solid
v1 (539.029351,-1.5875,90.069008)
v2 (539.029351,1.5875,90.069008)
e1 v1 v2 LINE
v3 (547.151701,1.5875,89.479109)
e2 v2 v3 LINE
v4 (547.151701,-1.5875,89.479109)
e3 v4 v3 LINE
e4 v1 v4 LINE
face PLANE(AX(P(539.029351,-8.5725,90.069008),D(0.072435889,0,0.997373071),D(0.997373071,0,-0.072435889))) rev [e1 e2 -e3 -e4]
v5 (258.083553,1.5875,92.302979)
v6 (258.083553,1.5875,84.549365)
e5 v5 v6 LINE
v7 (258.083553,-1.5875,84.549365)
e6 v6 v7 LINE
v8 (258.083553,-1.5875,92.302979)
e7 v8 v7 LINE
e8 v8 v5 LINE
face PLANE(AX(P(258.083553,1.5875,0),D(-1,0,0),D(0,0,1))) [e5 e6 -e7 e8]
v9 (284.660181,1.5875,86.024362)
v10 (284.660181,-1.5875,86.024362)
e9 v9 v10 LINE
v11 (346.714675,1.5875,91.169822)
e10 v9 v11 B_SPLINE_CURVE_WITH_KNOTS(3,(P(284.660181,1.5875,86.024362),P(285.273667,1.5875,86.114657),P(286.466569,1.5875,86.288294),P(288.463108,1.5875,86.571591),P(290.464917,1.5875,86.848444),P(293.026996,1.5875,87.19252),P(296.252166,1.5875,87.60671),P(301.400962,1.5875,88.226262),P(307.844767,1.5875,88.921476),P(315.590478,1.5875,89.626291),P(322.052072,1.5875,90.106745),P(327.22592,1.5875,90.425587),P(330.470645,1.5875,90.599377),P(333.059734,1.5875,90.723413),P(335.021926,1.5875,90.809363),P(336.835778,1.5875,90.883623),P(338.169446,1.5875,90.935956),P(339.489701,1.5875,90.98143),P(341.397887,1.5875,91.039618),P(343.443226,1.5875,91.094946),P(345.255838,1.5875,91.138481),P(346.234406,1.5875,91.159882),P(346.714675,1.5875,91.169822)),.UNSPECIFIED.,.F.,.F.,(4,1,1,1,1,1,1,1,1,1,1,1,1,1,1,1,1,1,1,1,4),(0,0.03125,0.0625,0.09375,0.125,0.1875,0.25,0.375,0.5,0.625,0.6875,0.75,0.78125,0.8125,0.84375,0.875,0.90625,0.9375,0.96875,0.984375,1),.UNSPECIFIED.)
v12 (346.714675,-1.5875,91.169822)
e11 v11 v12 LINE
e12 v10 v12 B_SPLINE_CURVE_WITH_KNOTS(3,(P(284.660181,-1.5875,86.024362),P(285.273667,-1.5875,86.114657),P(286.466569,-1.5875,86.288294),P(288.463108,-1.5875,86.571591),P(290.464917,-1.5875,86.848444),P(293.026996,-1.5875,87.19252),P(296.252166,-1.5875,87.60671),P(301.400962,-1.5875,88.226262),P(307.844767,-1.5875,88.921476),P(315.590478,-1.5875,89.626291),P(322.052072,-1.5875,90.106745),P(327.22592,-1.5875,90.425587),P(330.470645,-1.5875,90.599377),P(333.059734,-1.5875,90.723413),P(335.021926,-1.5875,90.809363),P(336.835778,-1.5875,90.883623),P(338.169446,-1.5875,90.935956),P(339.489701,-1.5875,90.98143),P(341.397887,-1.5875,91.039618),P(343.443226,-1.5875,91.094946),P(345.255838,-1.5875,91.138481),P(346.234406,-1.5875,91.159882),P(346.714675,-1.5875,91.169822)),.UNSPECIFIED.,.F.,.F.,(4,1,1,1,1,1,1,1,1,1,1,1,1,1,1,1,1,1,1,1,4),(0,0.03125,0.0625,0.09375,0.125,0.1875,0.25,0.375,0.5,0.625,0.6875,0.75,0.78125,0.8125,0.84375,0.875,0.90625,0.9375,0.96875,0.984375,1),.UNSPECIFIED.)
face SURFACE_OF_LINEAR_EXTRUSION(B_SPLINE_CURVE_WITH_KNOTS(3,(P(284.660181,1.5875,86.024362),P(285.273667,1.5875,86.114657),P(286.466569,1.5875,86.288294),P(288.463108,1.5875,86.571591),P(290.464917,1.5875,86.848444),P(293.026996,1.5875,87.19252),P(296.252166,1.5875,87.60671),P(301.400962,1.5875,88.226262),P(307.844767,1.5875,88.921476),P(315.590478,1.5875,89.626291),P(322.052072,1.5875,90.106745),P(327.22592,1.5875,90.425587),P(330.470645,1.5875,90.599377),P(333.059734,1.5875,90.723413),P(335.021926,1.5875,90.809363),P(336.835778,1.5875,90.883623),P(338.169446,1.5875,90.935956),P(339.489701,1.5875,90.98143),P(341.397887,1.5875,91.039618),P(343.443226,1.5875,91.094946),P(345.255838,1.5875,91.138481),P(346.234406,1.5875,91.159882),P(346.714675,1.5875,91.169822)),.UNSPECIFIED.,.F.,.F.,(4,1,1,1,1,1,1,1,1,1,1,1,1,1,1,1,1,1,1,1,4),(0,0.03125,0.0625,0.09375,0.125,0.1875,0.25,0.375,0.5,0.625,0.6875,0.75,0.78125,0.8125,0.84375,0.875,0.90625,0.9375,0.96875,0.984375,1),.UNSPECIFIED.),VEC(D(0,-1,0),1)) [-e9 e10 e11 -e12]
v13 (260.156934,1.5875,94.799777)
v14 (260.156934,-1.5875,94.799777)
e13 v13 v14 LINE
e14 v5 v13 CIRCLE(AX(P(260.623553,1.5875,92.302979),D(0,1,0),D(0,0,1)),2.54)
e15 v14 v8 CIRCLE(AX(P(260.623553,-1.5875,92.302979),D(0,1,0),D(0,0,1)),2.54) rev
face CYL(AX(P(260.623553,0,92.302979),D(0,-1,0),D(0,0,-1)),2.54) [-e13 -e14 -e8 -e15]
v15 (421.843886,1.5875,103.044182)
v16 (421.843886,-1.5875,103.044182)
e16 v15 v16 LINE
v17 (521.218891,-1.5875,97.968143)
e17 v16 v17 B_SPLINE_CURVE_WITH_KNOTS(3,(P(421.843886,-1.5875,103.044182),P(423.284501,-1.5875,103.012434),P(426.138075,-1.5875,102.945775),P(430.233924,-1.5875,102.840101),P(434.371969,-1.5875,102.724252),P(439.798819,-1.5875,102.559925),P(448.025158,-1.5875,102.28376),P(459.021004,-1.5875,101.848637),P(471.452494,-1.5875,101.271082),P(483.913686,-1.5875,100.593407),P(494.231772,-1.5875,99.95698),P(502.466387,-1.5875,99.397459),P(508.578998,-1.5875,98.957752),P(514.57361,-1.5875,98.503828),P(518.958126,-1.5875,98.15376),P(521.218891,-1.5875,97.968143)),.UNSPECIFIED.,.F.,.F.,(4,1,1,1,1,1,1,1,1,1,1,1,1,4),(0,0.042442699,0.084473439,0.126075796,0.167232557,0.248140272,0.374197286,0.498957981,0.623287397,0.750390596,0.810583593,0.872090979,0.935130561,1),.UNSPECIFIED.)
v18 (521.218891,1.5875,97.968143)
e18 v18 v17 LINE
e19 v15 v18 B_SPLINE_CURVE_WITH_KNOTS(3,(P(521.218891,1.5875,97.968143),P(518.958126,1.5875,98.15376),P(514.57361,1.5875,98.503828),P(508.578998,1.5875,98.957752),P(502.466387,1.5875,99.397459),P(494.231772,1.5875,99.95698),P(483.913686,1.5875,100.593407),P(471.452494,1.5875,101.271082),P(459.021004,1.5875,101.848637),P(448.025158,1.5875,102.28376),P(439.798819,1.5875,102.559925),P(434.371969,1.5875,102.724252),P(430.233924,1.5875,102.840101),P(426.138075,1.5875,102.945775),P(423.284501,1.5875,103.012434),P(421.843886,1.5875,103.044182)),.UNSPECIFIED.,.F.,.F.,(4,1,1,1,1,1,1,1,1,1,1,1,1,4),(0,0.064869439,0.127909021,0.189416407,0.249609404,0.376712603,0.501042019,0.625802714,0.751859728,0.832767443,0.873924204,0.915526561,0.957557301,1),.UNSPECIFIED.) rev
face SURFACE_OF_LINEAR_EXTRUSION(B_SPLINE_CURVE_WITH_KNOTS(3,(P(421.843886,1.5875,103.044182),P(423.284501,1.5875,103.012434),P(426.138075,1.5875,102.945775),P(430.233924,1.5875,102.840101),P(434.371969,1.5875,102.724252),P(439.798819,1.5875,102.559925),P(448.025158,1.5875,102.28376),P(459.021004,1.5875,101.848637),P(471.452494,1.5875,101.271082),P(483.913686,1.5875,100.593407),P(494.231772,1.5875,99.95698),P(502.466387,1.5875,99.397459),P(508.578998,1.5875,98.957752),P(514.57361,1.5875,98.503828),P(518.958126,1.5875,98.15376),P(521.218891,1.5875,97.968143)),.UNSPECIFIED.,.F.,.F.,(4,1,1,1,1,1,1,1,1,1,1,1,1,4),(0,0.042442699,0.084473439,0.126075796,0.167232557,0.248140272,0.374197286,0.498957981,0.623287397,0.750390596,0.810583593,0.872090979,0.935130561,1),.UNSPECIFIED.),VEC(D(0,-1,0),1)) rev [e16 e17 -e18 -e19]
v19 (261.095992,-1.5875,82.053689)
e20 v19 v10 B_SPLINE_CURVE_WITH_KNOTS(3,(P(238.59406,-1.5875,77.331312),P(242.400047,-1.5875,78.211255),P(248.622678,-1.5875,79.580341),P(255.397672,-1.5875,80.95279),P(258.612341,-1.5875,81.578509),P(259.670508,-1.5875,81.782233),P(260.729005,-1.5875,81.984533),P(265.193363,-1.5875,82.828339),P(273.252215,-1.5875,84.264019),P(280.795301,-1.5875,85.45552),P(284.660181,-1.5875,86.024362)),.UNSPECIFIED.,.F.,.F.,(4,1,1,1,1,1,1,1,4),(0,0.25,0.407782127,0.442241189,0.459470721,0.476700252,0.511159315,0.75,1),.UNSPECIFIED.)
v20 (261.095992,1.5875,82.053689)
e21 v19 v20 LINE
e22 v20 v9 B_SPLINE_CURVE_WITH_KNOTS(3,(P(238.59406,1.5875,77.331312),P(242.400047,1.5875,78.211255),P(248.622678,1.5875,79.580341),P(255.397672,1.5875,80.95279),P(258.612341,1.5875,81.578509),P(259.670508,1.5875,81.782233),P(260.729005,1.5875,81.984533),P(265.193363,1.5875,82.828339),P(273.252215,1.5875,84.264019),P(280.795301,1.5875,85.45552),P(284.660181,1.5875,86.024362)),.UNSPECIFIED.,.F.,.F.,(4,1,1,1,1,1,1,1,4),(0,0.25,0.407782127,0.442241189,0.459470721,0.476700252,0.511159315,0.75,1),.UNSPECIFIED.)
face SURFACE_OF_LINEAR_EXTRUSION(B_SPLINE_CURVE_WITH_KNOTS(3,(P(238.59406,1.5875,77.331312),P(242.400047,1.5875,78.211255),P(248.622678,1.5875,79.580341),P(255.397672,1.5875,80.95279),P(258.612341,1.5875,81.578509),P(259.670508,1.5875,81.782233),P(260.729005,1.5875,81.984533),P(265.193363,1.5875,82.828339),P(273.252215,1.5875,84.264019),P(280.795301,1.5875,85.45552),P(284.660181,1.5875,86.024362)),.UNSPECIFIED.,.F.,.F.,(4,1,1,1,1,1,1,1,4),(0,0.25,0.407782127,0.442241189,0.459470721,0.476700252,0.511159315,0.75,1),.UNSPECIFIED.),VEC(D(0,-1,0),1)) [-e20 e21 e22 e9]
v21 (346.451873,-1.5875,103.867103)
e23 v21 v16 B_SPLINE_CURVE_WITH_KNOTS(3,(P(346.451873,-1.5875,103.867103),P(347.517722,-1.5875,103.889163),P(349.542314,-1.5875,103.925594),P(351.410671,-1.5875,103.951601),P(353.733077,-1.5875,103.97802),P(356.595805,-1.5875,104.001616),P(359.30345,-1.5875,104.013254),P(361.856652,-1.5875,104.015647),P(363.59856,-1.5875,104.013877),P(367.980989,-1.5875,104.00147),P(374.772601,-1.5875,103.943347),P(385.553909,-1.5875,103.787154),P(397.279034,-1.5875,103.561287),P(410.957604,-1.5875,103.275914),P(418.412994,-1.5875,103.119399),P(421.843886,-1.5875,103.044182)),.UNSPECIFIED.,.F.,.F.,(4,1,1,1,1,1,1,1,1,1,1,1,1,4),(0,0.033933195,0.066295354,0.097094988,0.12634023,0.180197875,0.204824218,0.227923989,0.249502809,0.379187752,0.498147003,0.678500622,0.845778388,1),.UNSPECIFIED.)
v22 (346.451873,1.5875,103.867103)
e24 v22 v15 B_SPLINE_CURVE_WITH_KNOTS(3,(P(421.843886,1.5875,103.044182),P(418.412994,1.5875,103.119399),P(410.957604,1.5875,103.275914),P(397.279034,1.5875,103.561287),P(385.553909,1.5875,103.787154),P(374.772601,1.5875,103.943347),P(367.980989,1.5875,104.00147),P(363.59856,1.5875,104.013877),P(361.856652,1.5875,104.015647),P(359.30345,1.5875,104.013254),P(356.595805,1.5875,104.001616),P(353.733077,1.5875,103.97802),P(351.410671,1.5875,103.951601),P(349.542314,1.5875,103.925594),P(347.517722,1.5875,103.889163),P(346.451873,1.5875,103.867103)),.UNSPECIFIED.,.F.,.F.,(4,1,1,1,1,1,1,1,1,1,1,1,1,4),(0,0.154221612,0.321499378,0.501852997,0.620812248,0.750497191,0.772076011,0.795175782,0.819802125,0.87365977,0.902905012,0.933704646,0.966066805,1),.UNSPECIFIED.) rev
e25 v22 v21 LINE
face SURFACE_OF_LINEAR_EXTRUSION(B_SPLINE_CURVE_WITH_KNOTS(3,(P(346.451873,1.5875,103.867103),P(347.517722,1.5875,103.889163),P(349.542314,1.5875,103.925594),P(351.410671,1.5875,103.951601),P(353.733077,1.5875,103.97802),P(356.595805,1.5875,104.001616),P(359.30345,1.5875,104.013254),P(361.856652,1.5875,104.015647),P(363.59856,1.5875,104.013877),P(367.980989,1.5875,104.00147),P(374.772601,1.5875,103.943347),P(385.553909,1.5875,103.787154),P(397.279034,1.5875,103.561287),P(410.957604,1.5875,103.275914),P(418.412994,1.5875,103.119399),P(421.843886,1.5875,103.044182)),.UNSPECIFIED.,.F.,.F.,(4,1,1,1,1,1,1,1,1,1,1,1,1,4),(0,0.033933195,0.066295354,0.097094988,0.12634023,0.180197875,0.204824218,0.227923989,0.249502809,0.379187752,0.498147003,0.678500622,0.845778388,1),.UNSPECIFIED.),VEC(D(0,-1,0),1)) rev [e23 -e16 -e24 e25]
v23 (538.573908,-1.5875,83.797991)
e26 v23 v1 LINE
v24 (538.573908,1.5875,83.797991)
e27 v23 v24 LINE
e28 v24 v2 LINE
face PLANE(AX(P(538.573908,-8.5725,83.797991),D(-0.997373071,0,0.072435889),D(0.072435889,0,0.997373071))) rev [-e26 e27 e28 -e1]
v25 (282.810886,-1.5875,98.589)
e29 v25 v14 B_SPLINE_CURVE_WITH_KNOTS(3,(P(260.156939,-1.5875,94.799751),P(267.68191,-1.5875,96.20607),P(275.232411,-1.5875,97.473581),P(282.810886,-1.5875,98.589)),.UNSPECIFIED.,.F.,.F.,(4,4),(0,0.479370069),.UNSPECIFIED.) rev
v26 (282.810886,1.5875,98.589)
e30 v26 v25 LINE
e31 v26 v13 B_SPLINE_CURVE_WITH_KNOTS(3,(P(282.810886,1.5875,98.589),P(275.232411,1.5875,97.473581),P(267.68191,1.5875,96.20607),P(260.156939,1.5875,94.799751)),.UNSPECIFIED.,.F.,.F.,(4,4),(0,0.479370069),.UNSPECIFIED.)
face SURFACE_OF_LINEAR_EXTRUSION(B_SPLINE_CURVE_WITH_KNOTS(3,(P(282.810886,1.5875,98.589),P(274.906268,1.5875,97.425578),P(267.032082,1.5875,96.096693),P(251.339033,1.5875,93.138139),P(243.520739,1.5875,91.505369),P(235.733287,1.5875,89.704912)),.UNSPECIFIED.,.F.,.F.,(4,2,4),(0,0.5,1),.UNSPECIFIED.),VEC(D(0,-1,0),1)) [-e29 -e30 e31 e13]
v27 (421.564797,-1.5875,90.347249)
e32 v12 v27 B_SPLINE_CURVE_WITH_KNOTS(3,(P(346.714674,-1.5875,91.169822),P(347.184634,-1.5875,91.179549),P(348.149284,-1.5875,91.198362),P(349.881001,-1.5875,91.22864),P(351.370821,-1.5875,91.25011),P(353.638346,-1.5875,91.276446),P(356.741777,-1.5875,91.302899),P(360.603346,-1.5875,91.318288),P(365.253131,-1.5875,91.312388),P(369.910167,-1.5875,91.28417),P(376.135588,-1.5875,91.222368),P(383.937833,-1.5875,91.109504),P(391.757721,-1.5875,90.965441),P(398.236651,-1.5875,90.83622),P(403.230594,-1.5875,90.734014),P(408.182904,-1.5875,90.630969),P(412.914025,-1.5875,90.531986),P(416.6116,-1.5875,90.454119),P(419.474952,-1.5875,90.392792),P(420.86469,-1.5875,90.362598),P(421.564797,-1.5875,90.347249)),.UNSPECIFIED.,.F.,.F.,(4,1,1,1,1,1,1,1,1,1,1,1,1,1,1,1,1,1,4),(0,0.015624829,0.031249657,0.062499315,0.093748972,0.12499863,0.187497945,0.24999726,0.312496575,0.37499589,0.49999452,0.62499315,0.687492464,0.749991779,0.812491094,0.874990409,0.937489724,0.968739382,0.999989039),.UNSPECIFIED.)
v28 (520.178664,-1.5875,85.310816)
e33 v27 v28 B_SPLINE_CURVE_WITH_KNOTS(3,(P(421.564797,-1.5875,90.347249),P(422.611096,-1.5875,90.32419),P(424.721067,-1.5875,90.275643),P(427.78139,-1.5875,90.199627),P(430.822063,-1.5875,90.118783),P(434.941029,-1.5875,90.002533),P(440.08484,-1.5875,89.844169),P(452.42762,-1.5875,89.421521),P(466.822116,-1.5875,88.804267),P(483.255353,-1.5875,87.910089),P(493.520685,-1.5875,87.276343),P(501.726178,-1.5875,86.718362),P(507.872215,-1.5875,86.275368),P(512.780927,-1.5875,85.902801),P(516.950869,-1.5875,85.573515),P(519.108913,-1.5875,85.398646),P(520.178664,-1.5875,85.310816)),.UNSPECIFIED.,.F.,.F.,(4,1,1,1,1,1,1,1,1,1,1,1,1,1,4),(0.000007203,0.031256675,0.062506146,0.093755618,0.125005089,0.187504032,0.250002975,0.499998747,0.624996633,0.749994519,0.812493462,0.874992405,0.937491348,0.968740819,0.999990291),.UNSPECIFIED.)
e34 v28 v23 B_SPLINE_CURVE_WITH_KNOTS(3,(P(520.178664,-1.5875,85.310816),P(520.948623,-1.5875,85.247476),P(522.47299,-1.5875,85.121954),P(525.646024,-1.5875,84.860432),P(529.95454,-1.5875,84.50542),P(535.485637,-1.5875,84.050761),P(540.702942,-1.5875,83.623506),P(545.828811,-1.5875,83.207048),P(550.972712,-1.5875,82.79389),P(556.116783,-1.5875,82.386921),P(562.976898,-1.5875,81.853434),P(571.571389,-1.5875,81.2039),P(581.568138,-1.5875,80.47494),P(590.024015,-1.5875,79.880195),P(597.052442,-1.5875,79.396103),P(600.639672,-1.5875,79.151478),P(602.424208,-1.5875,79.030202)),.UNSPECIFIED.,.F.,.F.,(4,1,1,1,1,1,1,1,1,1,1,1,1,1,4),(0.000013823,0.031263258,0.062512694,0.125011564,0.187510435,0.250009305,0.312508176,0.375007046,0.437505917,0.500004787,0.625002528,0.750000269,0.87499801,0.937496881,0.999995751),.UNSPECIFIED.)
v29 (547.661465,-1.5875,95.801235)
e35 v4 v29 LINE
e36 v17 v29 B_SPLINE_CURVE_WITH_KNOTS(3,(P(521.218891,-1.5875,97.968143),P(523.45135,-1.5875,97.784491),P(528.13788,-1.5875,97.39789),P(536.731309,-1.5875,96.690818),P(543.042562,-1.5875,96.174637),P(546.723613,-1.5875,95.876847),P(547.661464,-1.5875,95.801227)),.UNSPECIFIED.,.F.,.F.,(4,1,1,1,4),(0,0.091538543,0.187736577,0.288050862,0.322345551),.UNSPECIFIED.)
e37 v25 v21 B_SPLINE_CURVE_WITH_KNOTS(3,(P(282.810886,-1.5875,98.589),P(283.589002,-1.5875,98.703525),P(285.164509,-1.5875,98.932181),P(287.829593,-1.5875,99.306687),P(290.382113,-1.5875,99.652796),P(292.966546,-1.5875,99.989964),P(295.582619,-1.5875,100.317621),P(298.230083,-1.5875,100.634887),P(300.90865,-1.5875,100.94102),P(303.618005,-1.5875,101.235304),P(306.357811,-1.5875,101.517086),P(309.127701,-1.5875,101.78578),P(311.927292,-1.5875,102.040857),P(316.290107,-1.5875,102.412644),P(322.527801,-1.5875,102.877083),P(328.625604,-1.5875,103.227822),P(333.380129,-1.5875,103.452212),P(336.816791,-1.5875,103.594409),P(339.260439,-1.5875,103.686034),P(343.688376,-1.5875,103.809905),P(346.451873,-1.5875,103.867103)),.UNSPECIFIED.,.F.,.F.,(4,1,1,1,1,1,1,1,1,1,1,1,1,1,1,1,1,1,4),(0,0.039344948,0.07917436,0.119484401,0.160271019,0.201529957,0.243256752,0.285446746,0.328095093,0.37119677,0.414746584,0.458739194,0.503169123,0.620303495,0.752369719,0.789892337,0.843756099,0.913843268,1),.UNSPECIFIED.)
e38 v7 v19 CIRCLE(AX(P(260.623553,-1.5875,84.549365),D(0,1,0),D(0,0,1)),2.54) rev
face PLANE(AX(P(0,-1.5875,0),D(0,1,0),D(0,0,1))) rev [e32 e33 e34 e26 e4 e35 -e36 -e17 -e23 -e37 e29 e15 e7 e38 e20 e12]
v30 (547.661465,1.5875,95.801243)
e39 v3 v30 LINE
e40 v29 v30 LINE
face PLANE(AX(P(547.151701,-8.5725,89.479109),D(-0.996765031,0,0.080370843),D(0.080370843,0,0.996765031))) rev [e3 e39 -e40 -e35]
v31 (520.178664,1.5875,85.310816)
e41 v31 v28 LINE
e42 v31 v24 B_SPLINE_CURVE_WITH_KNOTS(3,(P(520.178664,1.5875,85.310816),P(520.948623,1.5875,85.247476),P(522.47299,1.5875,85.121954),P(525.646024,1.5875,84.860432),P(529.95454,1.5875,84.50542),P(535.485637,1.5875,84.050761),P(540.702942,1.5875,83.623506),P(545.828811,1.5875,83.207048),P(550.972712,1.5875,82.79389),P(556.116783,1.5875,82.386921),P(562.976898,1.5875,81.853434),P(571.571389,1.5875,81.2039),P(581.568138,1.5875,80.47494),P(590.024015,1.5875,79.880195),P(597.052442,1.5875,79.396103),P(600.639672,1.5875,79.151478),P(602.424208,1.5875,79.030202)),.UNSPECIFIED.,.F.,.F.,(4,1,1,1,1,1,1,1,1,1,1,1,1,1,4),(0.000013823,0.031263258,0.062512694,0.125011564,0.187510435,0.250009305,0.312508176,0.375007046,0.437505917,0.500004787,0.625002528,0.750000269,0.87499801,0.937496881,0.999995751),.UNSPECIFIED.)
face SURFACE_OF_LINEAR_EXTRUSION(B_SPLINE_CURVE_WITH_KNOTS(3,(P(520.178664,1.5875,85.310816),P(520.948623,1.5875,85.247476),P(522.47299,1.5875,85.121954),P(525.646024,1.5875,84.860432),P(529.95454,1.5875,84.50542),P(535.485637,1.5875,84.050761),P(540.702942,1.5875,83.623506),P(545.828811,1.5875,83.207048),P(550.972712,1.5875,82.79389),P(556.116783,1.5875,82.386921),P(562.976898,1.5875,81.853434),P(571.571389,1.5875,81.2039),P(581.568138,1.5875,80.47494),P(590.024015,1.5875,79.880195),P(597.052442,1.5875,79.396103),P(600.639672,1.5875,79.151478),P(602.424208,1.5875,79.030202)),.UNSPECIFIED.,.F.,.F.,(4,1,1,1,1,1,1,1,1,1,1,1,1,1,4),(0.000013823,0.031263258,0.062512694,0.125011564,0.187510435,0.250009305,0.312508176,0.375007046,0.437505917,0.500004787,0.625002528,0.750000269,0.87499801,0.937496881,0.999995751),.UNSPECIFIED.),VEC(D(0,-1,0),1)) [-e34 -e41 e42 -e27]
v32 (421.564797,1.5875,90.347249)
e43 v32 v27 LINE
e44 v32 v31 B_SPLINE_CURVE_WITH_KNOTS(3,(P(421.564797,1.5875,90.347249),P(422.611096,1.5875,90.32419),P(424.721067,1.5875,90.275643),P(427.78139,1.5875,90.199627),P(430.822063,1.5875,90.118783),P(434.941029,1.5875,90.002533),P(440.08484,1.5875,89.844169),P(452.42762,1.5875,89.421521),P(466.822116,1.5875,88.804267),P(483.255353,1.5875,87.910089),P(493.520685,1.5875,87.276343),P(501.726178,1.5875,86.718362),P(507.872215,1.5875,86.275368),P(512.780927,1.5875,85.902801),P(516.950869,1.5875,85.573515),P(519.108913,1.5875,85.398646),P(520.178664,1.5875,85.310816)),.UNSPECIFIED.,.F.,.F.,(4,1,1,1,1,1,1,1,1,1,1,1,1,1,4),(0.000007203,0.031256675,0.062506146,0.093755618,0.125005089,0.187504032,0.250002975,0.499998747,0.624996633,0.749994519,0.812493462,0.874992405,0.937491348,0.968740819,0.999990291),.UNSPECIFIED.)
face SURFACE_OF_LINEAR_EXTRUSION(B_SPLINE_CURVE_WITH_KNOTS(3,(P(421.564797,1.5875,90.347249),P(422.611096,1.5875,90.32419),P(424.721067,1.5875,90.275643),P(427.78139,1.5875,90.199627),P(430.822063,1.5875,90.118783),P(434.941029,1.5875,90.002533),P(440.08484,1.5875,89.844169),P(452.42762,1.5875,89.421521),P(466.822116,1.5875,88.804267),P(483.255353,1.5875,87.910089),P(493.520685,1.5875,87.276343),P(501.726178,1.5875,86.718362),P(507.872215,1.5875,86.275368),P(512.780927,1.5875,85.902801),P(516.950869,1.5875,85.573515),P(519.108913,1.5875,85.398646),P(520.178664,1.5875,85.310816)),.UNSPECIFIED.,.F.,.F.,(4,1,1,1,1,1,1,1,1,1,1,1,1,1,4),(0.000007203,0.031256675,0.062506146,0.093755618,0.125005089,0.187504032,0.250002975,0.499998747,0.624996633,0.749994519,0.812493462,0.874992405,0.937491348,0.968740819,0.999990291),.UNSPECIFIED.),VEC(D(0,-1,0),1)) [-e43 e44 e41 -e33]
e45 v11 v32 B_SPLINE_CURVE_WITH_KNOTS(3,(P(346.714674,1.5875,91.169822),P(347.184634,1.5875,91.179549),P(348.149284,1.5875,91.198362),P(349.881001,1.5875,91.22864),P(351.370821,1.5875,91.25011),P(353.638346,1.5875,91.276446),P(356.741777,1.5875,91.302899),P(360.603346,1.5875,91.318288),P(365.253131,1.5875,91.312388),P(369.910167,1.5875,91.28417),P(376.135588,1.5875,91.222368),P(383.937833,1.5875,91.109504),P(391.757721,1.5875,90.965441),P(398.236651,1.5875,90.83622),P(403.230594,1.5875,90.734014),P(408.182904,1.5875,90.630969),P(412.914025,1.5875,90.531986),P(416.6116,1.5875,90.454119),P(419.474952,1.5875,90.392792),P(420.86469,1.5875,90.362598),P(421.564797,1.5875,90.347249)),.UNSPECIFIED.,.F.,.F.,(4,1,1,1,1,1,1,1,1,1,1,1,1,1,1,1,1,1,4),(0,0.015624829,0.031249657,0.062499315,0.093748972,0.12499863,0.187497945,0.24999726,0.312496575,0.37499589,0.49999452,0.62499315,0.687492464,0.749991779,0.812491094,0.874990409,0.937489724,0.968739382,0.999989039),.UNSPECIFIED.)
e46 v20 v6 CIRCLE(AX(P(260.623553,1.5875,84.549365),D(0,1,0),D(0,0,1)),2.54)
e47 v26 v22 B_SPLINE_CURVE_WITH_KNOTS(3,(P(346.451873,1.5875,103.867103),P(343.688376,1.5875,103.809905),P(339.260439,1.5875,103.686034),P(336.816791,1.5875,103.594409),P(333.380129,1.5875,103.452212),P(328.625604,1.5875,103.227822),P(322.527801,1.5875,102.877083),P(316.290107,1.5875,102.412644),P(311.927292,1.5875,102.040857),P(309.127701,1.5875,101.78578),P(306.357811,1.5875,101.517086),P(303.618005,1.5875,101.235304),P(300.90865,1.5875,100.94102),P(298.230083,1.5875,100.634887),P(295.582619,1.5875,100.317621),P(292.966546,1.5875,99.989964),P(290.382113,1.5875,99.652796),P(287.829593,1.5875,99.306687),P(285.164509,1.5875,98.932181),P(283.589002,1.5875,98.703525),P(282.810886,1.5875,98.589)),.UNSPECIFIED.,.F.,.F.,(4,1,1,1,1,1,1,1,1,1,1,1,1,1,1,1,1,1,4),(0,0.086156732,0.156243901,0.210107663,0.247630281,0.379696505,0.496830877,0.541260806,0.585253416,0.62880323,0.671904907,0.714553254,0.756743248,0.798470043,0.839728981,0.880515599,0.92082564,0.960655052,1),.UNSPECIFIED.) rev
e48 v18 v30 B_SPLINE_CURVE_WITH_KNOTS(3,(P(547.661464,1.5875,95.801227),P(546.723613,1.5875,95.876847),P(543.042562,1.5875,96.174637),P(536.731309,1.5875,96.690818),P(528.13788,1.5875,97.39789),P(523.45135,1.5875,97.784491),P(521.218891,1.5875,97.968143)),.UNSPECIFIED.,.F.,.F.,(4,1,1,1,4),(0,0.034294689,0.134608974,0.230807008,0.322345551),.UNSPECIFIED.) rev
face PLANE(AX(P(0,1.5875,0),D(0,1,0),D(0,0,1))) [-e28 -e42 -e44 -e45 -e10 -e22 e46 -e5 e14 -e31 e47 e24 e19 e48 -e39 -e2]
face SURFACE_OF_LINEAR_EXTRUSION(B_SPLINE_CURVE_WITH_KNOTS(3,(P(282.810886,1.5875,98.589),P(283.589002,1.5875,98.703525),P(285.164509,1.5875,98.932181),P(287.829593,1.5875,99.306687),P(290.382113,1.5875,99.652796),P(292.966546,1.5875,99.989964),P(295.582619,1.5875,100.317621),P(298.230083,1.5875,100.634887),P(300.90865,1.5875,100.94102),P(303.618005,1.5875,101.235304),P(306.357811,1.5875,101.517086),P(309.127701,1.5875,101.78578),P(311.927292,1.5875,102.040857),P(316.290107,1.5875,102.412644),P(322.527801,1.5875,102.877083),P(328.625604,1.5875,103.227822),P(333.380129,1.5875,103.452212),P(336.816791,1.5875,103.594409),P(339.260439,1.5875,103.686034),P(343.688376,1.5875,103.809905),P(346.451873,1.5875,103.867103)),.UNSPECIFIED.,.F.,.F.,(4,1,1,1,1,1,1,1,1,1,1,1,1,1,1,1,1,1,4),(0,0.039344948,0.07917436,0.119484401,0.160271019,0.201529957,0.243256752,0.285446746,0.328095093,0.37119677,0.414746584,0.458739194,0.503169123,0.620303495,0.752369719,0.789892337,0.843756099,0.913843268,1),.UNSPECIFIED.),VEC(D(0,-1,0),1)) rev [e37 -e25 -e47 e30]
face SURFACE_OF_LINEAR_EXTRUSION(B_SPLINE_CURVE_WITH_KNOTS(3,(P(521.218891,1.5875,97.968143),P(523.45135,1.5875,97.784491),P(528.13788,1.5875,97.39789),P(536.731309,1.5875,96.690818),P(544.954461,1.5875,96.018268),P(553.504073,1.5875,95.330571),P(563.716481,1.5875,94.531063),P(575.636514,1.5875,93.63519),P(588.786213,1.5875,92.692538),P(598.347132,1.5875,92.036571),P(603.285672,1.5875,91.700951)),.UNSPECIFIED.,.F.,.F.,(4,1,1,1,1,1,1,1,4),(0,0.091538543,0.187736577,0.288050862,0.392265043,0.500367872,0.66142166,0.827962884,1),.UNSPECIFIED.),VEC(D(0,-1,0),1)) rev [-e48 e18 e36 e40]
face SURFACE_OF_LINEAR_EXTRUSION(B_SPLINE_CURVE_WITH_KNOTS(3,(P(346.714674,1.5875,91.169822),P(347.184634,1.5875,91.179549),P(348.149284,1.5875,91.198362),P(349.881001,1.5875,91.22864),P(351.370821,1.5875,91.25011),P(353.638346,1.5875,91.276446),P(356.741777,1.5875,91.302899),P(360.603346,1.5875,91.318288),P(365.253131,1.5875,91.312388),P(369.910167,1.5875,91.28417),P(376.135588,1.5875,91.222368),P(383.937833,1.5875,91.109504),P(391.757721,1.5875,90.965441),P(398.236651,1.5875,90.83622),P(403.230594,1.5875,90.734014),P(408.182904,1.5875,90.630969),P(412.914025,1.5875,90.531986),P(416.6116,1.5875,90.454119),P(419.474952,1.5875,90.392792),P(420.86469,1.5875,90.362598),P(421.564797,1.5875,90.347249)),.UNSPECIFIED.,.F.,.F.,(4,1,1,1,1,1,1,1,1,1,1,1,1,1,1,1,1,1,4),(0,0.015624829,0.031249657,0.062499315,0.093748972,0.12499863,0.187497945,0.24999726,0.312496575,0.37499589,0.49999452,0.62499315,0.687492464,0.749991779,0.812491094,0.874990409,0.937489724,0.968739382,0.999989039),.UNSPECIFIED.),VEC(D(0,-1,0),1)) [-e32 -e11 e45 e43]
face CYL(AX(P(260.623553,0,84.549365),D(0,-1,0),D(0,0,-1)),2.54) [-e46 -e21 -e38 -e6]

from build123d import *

# Parameters (mm, degrees)
BOSS_EXTRUDE1_START = -1.5875
BOSS_EXTRUDE1_DEPTH = 3.175
FILLET1_R           = 2.54
CUT_EXTRUDE1_DEPTH  = 10.16


# Read off the part's stored shape, not the designer's step: Boss-Extrude1
with BuildPart() as part:
    # Boss-Extrude1 outline → Boss-Extrude1 (new body)
    with BuildSketch(Plane(origin=(0, 0, 0), x_dir=(1, 0, 0), z_dir=(0, 1, 0)).offset(BOSS_EXTRUDE1_START)):
        with BuildLine():
            add(Edge.make_bspline(
                [(701.573370465, -71.674259434), (702.04697488, -71.626796619), (702.961854911, -71.534187022), (704.527211696, -71.372087014), (706.256268563, -71.189411511), (708.433468196, -70.954566837), (711.038260137, -70.66442021), (715.259153852, -70.176918919), (720.517449562, -69.537326192), (728.939784684, -68.449094171), (739.471043309, -66.973596397), (752.121699379, -65.058370184), (764.774270693, -63.022725712), (775.332382372, -61.245644149), (783.768221701, -59.789793136), (790.217423582, -58.659365862), (795.556531692, -57.710632329), (799.706029598, -56.965839367), (801.743713725, -56.597532565), (802.76701547, -56.411910209)],
                knots=[1.1996e-05, 1.1996e-05, 1.1996e-05, 1.1996e-05, 0.015636808, 0.031261621, 0.046886433, 0.062511246, 0.093760871, 0.125010496, 0.187509746, 0.250008997, 0.375007497, 0.500005998, 0.625004498, 0.750002999, 0.812502249, 0.875001499, 0.93750075, 0.968750375, 1, 1, 1, 1], degree=3))
            add(Edge.make_bspline(
                [(696.057912544, -72.218303811), (696.516819195, -72.173843609), (697.434189716, -72.08448281), (698.812500771, -71.948951554), (700.191895387, -71.812223809), (701.113019016, -71.720314305), (701.573370465, -71.674259434)],
                knots=[0.000436824, 0.000436824, 0.000436824, 0.000436824, 0.250279009, 0.500121194, 0.749963378, 0.999805563, 0.999805563, 0.999805563, 0.999805563], degree=3))
            add(Edge.make_bspline(
                [(684.465771861, -73.258588893), (685.427037387, -73.178353817), (687.338409796, -73.01607439), (690.270265001, -72.757917882), (693.135698373, -72.496722872), (695.087462196, -72.311946881), (696.057912544, -72.218303811)],
                knots=[-3.996e-06, -3.996e-06, -3.996e-06, -3.996e-06, 0.249945754, 0.499895504, 0.749845254, 0.999795004, 0.999795004, 0.999795004, 0.999795004], degree=3))
            add(Edge.make_bspline(
                [(602.42420841, -79.030202072), (604.074214061, -78.917973041), (607.327656264, -78.697993222), (612.488020924, -78.352754528), (617.82142797, -77.998720132), (624.748165187, -77.541006681), (633.288768179, -76.978079707), (643.562499486, -76.293021789), (653.811394813, -75.590339748), (662.341271598, -74.981221252), (669.157253218, -74.473896148), (673.963588211, -74.106706625), (678.141033863, -73.776630779), (681.719672317, -73.486306526), (683.554235836, -73.334679882), (684.465771861, -73.258588893)],
                knots=[4.679e-06, 4.679e-06, 4.679e-06, 4.679e-06, 0.062504419, 0.125004159, 0.1875039, 0.25000364, 0.375003121, 0.500002601, 0.625002082, 0.750001563, 0.812501303, 0.875001043, 0.937500783, 0.968750654, 1.000000524, 1.000000524, 1.000000524, 1.000000524], degree=3))
            add(Edge.make_bspline(
                [(520.17866376, -85.310815783), (520.948622537, -85.247475703), (522.472990474, -85.121954498), (525.646023872, -84.860432492), (529.954540392, -84.505420462), (535.485636827, -84.050761487), (540.7029418, -83.623505808), (545.828810606, -83.207047886), (550.972711882, -82.793890253), (556.116782859, -82.386921041), (562.976897794, -81.853433898), (571.571389273, -81.203899916), (581.568137842, -80.474939815), (590.024015055, -79.880194977), (597.052441707, -79.396103056), (600.639671821, -79.151478022), (602.42420841, -79.030202072)],
                knots=[1.3823e-05, 1.3823e-05, 1.3823e-05, 1.3823e-05, 0.031263258, 0.062512694, 0.125011564, 0.187510435, 0.250009305, 0.312508176, 0.375007046, 0.437505917, 0.500004787, 0.625002528, 0.750000269, 0.87499801, 0.937496881, 0.999995751, 0.999995751, 0.999995751, 0.999995751], degree=3))
            add(Edge.make_bspline(
                [(421.564796931, -90.347249187), (422.61109619, -90.324190198), (424.721066812, -90.275643156), (427.781390104, -90.199626606), (430.822063258, -90.118782847), (434.941029322, -90.002532976), (440.08484045, -89.844168641), (452.427619866, -89.421521336), (466.822115937, -88.804267378), (483.25535308, -87.910089241), (493.52068453, -87.276342604), (501.726177762, -86.718361924), (507.872215251, -86.275368153), (512.780927318, -85.902800926), (516.950869137, -85.573515025), (519.108912611, -85.398645627), (520.17866376, -85.310815783)],
                knots=[7.203e-06, 7.203e-06, 7.203e-06, 7.203e-06, 0.031256675, 0.062506146, 0.093755618, 0.125005089, 0.187504032, 0.250002975, 0.499998747, 0.624996633, 0.749994519, 0.812493462, 0.874992405, 0.937491348, 0.968740819, 0.999990291, 0.999990291, 0.999990291, 0.999990291], degree=3))
            add(Edge.make_bspline(
                [(346.714675087, -91.169822314), (347.184634959, -91.179549272), (348.149283989, -91.198362445), (349.881001429, -91.228640124), (351.370820969, -91.250109563), (353.638345707, -91.276445536), (356.741777131, -91.30289862), (360.603346067, -91.318288447), (365.253131479, -91.312388009), (369.910166762, -91.284169995), (376.135587827, -91.222367993), (383.937832745, -91.109503558), (391.757720532, -90.96544109), (398.23665113, -90.836219907), (403.230594411, -90.734014325), (408.182903858, -90.630969164), (412.914025095, -90.531986169), (416.611599734, -90.454119205), (419.474951766, -90.392792196), (420.864689854, -90.36259776), (421.564796931, -90.347249187)],
                knots=[1.1e-08, 1.1e-08, 1.1e-08, 1.1e-08, 0.015624829, 0.031249657, 0.062499315, 0.093748972, 0.12499863, 0.187497945, 0.24999726, 0.312496575, 0.37499589, 0.49999452, 0.62499315, 0.687492464, 0.749991779, 0.812491094, 0.874990409, 0.937489724, 0.968739382, 0.999989039, 0.999989039, 0.999989039, 0.999989039], degree=3))
            add(Edge.make_bspline(
                [(284.660180705, -86.02436228), (285.273667186, -86.114656759), (286.466569449, -86.288293963), (288.463107874, -86.571590524), (290.46491743, -86.848444068), (293.02699573, -87.19252046), (296.252166304, -87.606710304), (301.400962421, -88.226261718), (307.844767088, -88.921476193), (315.590478493, -89.626291032), (322.05207179, -90.106744711), (327.225920355, -90.425587153), (330.470644664, -90.599377294), (333.059733967, -90.723413499), (335.02192621, -90.809363102), (336.835778016, -90.883623075), (338.1694462, -90.935956115), (339.489700776, -90.98142965), (341.397886756, -91.039617592), (343.443225624, -91.094945655), (345.255837503, -91.138480537), (346.23440638, -91.159881953), (346.714675087, -91.169822314)],
                knots=[0, 0, 0, 0, 0.03125, 0.0625, 0.09375, 0.125, 0.1875, 0.25, 0.375, 0.5, 0.625, 0.6875, 0.75, 0.78125, 0.8125, 0.84375, 0.875, 0.90625, 0.9375, 0.96875, 0.984375, 1, 1, 1, 1], degree=3))
            add(Edge.make_bspline(
                [(258.083552795, -81.475395447), (258.347968296, -81.526862936), (258.876883054, -81.629439687), (259.670508063, -81.782232521), (260.729004783, -81.984533344), (265.19336261, -82.828339408), (273.252215122, -84.264018509), (280.795301047, -85.455519597), (284.660180705, -86.02436228)],
                knots=[0.425011658, 0.425011658, 0.425011658, 0.425011658, 0.442241189, 0.459470721, 0.476700252, 0.511159315, 0.75, 1, 1, 1, 1], degree=3))
            Line((258.083552795, -81.475395447), (258.083552795, -94.40861288))
            add(Edge.make_bspline(
                [(282.810885884, -98.588999508), (274.906267762, -97.425577983), (267.032082315, -96.096692803), (258.818160589, -94.548151889), (258.450825612, -94.478551371), (258.083552795, -94.40861288)],
                knots=[0, 0, 0, 0, 0.5, 0.5, 0.523411439, 0.523411439, 0.523411439, 0.523411439], degree=3))
            add(Edge.make_bspline(
                [(282.810885884, -98.588999508), (283.589001764, -98.703524555), (285.164508504, -98.932181064), (287.829592849, -99.306686744), (290.382113422, -99.652796041), (292.96654593, -99.989964246), (295.582618612, -100.317621114), (298.230083081, -100.634886778), (300.908649594, -100.941019762), (303.61800528, -101.235303734), (306.357810596, -101.517085869), (309.127700691, -101.785780175), (311.92729165, -102.040857239), (316.290106771, -102.412643883), (322.527800913, -102.877083333), (328.625603501, -103.227822262), (333.380129051, -103.452212237), (336.816790701, -103.594408746), (339.260438836, -103.686034081), (343.688375923, -103.809905452), (346.451873128, -103.867102934)],
                knots=[0, 0, 0, 0, 0.039344948, 0.07917436, 0.119484401, 0.160271019, 0.201529957, 0.243256752, 0.285446746, 0.328095093, 0.37119677, 0.414746584, 0.458739194, 0.503169123, 0.620303495, 0.752369719, 0.789892337, 0.843756099, 0.913843268, 1, 1, 1, 1], degree=3))
            add(Edge.make_bspline(
                [(346.451873128, -103.867102934), (347.517721695, -103.889163254), (349.542313965, -103.92559437), (351.410670783, -103.951601003), (353.733077388, -103.97802022), (356.595805361, -104.001616052), (359.303450326, -104.013254143), (361.856652408, -104.015647305), (363.59855953, -104.013876583), (367.980988834, -104.00146953), (374.772600805, -103.943346872), (385.553908564, -103.787153573), (397.279033824, -103.561287268), (410.957604412, -103.27591363), (418.412993695, -103.119398813), (421.843885938, -103.044182276)],
                knots=[0, 0, 0, 0, 0.033933195, 0.066295354, 0.097094988, 0.12634023, 0.180197875, 0.204824218, 0.227923989, 0.249502809, 0.379187752, 0.498147003, 0.678500622, 0.845778388, 1, 1, 1, 1], degree=3))
            add(Edge.make_bspline(
                [(421.843885938, -103.044182276), (423.284501257, -103.01243375), (426.138074601, -102.945774905), (430.23392379, -102.840101392), (434.371968877, -102.72425222), (439.798819101, -102.559925422), (448.025157593, -102.283759658), (459.021003941, -101.848637215), (471.45249354, -101.271082202), (483.913686147, -100.593406887), (494.231772367, -99.956980278), (502.466387344, -99.39745886), (508.578998405, -98.957752379), (514.573610191, -98.503827918), (518.958126171, -98.153760061), (521.218891036, -97.968142841)],
                knots=[0, 0, 0, 0, 0.042442699, 0.084473439, 0.126075796, 0.167232557, 0.248140272, 0.374197286, 0.498957981, 0.623287397, 0.750390596, 0.810583593, 0.872090979, 0.935130561, 1, 1, 1, 1], degree=3))
            add(Edge.make_bspline(
                [(521.218891036, -97.968142841), (523.451350188, -97.784491424), (528.137879673, -97.397889698), (536.731309482, -96.690817555), (544.954460679, -96.018267543), (553.50407331, -95.33057133), (563.716480518, -94.531063336), (575.636513939, -93.635190253), (588.786212869, -92.692538058), (598.347131864, -92.036570917), (603.285671904, -91.700951094)],
                knots=[0, 0, 0, 0, 0.091538543, 0.187736577, 0.288050862, 0.392265043, 0.500367872, 0.66142166, 0.827962884, 1, 1, 1, 1], degree=3))
            add(Edge.make_bspline(
                [(603.285671904, -91.700951094), (605.78808228, -91.530743591), (610.897032353, -91.186403467), (619.306599861, -90.627823918), (627.538601032, -90.084789882), (635.936476676, -89.530098998), (643.719546666, -89.009847824), (650.893783861, -88.520535985), (657.46530725, -88.061941255), (664.220349455, -87.576914876), (671.158631923, -87.060362733), (677.768426526, -86.549575155), (682.892578542, -86.13408317), (685.522190682, -85.9145748)],
                knots=[0, 0, 0, 0, 0.096041268, 0.194096291, 0.29416615, 0.396252661, 0.500358628, 0.578021943, 0.657927659, 0.740076076, 0.824468696, 0.911108458, 1, 1, 1, 1], degree=3))
            add(Edge.make_bspline(
                [(685.522190682, -85.9145748), (686.483363358, -85.834347474), (688.416317483, -85.670266195), (691.375399642, -85.409794673), (694.295027309, -85.143745348), (696.281480154, -84.95572275), (697.280162315, -84.859352478)],
                knots=[0, 0, 0, 0, 0.247890437, 0.497182912, 0.747883707, 1, 1, 1, 1], degree=3))
            add(Edge.make_bspline(
                [(697.280162315, -84.859352478), (699.133498258, -84.679799353), (700.986276607, -84.496390936), (702.838684367, -84.311070025)],
                knots=[0, 0, 0, 0, 1, 1, 1, 1], degree=3))
            add(Edge.make_bspline(
                [(702.838684367, -84.311070025), (703.589775295, -84.235799752), (705.133492987, -84.078629058), (708.047466313, -83.771407142), (710.748991263, -83.476233306), (713.523455705, -83.162791229), (716.37085234, -82.830812164), (719.291149506, -82.479719712), (722.284334057, -82.109050619), (725.350396028, -81.718303946), (730.760173437, -81.009658613), (740.331799838, -79.683632118), (753.598097399, -77.68903736), (767.27468421, -75.481732644), (778.677358422, -73.559116698), (788.170711893, -71.915943965), (796.891357387, -70.375844053), (802.366731643, -69.391771369), (805.033747795, -68.907986576)],
                knots=[0, 0, 0, 0, 0.024848372, 0.050416521, 0.076704883, 0.103713975, 0.131444397, 0.159896834, 0.189072062, 0.218970945, 0.249594443, 0.347406526, 0.499390399, 0.638902952, 0.749436379, 0.834969029, 0.918499168, 1, 1, 1, 1], degree=3))
            Line((805.033747795, -68.907986576), (806.809551789, -68.578936168))
            add(Edge.make_bspline(
                [(806.809551789, -68.578936168), (807.794004822, -68.395119755), (809.726191369, -68.029713589), (811.766757719, -67.634799792), (814.185248792, -67.158567155), (816.55886725, -66.68111941), (820.369254046, -65.898841142), (824.807312319, -64.951185469), (829.827239229, -63.826217582), (833.268092373, -63.026324522), (835.935211118, -62.389425037), (837.873162846, -61.91853539), (839.769381429, -61.449895816), (841.624127129, -60.983575945), (843.734931971, -60.443149682), (844.733875611, -60.183258894), (845.223156672, -60.055102096)],
                knots=[0, 0, 0, 0, 0.064848776, 0.128591831, 0.191223632, 0.252742215, 0.313148507, 0.487734154, 0.598660779, 0.705288655, 0.75701083, 0.807682273, 0.85731034, 0.905901891, 0.953463218, 1, 1, 1, 1], degree=3))
            add(Edge.make_bspline(
                [(858.805970467, -56.257210913), (854.302265416, -57.602424975), (849.773135735, -58.863331563), (845.223156672, -60.055102096)],
                knots=[0.525572557, 0.525572557, 0.525572557, 0.525572557, 1, 1, 1, 1], degree=3))
            Line((858.805970467, -56.257210913), (858.805970467, -42.981654463))
            add(Edge.make_bspline(
                [(842.005216089, -47.769547229), (844.33209519, -47.160070589), (848.630876213, -45.996859499), (853.420502494, -44.614540459), (856.161610787, -43.791878163), (857.220661541, -43.470009626), (858.013965236, -43.226852548), (858.542087125, -43.063586295), (858.805970467, -42.981654463)],
                knots=[0, 0, 0, 0, 0.25, 0.462204418, 0.52007177, 0.549005446, 0.577939123, 0.606872799, 0.606872799, 0.606872799, 0.606872799], degree=3))
            add(Edge.make_bspline(
                [(804.478503109, -56.094697623), (804.937261418, -56.009038578), (805.873535899, -55.833158182), (807.593890186, -55.506511486), (809.223478159, -55.191529302), (811.577863033, -54.728351346), (814.728198308, -54.095426794), (818.65467417, -53.281335813), (823.355137668, -52.264852214), (828.043123472, -51.207419322), (831.9339187, -50.292144023), (835.047083584, -49.53591133), (836.970069876, -49.058975401), (838.551971708, -48.659746263), (839.885294081, -48.319263071), (841.0585054, -48.016793361), (841.676038434, -47.855768334), (842.005216089, -47.769547229)],
                knots=[0, 0, 0, 0, 0.03125, 0.0625, 0.125, 0.1875, 0.25, 0.375, 0.5, 0.625, 0.75, 0.8125, 0.875, 0.90625, 0.9375, 0.96875, 1, 1, 1, 1], degree=3))
            Line((804.478503109, -56.094697623), (802.76701547, -56.411910209))
        make_face()
    extrude(amount=BOSS_EXTRUDE1_DEPTH)

    # Fillet1
    fillet1_edges = [part.edges().sort_by_distance(p)[0] for p in [
        (858.805970467, 0, 42.981654463),
        (858.805970467, 0, 56.257210913),
        (258.083552795, 0, 81.475395447),
        (258.083552795, 0, 94.40861288),
    ]]
    fillet(fillet1_edges, radius=FILLET1_R)

    # Sketch3 → Cut-Extrude1 (cut)
    with BuildSketch(Plane(origin=(0, 1.5875, 0), x_dir=(1, 0, 0), z_dir=(0, 1, 0))):
        with BuildLine():
            Line((538.573908081, -83.797990994), (539.029351184, -90.069007907))
            Line((539.029351184, -90.069007907), (547.151700891, -89.47910866))
            Line((547.151700891, -89.47910866), (547.661463933, -95.801226886))
            add(Edge.make_bspline(
                [(547.661463933, -95.801226886), (549.573540603, -95.647052923), (554.442098815, -95.257135276), (563.716480518, -94.531063336), (575.636513939, -93.635190253), (588.786212869, -92.692538058), (598.347131864, -92.036570917), (603.285671904, -91.700951094)],
                knots=[0.322345551, 0.322345551, 0.322345551, 0.322345551, 0.392265043, 0.500367872, 0.66142166, 0.827962884, 1, 1, 1, 1], degree=3))
            add(Edge.make_bspline(
                [(603.285671904, -91.700951094), (605.78808228, -91.530743591), (610.897032353, -91.186403467), (619.306599861, -90.627823918), (627.538601032, -90.084789882), (635.936476676, -89.530098998), (643.719546666, -89.009847824), (650.893783861, -88.520535985), (657.46530725, -88.061941255), (664.220349455, -87.576914876), (671.158631923, -87.060362733), (677.768426526, -86.549575155), (682.892578542, -86.13408317), (685.522190682, -85.9145748)],
                knots=[0, 0, 0, 0, 0.096041268, 0.194096291, 0.29416615, 0.396252661, 0.500358628, 0.578021943, 0.657927659, 0.740076076, 0.824468696, 0.911108458, 1, 1, 1, 1], degree=3))
            add(Edge.make_bspline(
                [(685.522190682, -85.9145748), (686.483363358, -85.834347474), (688.416317483, -85.670266195), (691.375399642, -85.409794673), (694.295027309, -85.143745348), (696.281480154, -84.95572275), (697.280162315, -84.859352478)],
                knots=[0, 0, 0, 0, 0.247890437, 0.497182912, 0.747883707, 1, 1, 1, 1], degree=3))
            add(Edge.make_bspline(
                [(697.280162315, -84.859352478), (699.133498258, -84.679799353), (700.986276607, -84.496390936), (702.838684367, -84.311070025)],
                knots=[0, 0, 0, 0, 1, 1, 1, 1], degree=3))
            add(Edge.make_bspline(
                [(702.838684367, -84.311070025), (703.589775295, -84.235799752), (705.133492987, -84.078629058), (708.047466313, -83.771407142), (710.748991263, -83.476233306), (713.523455705, -83.162791229), (716.37085234, -82.830812164), (719.291149506, -82.479719712), (722.284334057, -82.109050619), (725.350396028, -81.718303946), (730.760173437, -81.009658613), (740.331799838, -79.683632118), (753.598097399, -77.68903736), (767.27468421, -75.481732644), (778.677358422, -73.559116698), (788.170711893, -71.915943965), (796.891357387, -70.375844053), (802.366731643, -69.391771369), (805.033747795, -68.907986576)],
                knots=[0, 0, 0, 0, 0.024848372, 0.050416521, 0.076704883, 0.103713975, 0.131444397, 0.159896834, 0.189072062, 0.218970945, 0.249594443, 0.347406526, 0.499390399, 0.638902952, 0.749436379, 0.834969029, 0.918499168, 1, 1, 1, 1], degree=3))
            Line((805.033747795, -68.907986576), (806.809551789, -68.578936168))
            add(Edge.make_bspline(
                [(806.809551789, -68.578936168), (807.794004822, -68.395119755), (809.726191369, -68.029713589), (811.766757719, -67.634799792), (814.185248792, -67.158567155), (816.55886725, -66.68111941), (820.369254046, -65.898841142), (824.807312319, -64.951185469), (829.827239229, -63.826217582), (833.268092373, -63.026324522), (835.935211118, -62.389425037), (837.873162846, -61.91853539), (839.769381429, -61.449895816), (841.624127129, -60.983575945), (843.734931971, -60.443149682), (844.733875611, -60.183258894), (845.223156672, -60.055102096)],
                knots=[0, 0, 0, 0, 0.064848776, 0.128591831, 0.191223632, 0.252742215, 0.313148507, 0.487734154, 0.598660779, 0.705288655, 0.75701083, 0.807682273, 0.85731034, 0.905901891, 0.953463218, 1, 1, 1, 1], degree=3))
            add(Edge.make_bspline(
                [(845.223156672, -60.055102096), (849.158938128, -59.024204428), (853.079119118, -57.941576123), (856.980738351, -56.797397641)],
                knots=[0.589615008, 0.589615008, 0.589615008, 0.589615008, 1, 1, 1, 1], degree=3))
            ThreePointArc((856.980738351, -56.797397641), (858.299078563, -55.882556759), (858.805970467, -54.360050704))
            Line((858.805970467, -54.360050704), (858.805970467, -46.412138384))
            ThreePointArc((858.805970467, -46.412138384), (857.782327313, -44.374428415), (855.536472895, -43.979149832))
            add(Edge.make_bspline(
                [(855.536472895, -43.979149832), (855.302707966, -44.049240975), (853.122392665, -44.700577003), (848.630876213, -45.996859499), (844.33209519, -47.160070589), (842.005216089, -47.769547229)],
                knots=[0, 0, 0, 0, 0.025497707, 0.237702124, 0.487702124, 0.487702124, 0.487702124, 0.487702124], degree=3))
            add(Edge.make_bspline(
                [(842.005216089, -47.769547229), (841.676038434, -47.855768334), (841.0585054, -48.016793361), (839.885294081, -48.319263071), (838.551971708, -48.659746263), (836.970069876, -49.058975401), (835.047083584, -49.53591133), (831.9339187, -50.292144023), (828.043123472, -51.207419322), (823.355137668, -52.264852214), (818.65467417, -53.281335813), (814.728198308, -54.095426794), (811.577863033, -54.728351346), (809.223478159, -55.191529302), (807.593890186, -55.506511486), (805.873535899, -55.833158182), (804.937261418, -56.009038578), (804.478503109, -56.094697623)],
                knots=[0, 0, 0, 0, 0.03125, 0.0625, 0.09375, 0.125, 0.1875, 0.25, 0.375, 0.5, 0.625, 0.75, 0.8125, 0.875, 0.9375, 0.96875, 1, 1, 1, 1], degree=3))
            Line((804.478503109, -56.094697623), (802.76701547, -56.411910209))
            add(Edge.make_bspline(
                [(802.76701547, -56.411910209), (801.743713725, -56.597532565), (799.706029598, -56.965839367), (795.556531692, -57.710632329), (790.217423582, -58.659365862), (783.768221701, -59.789793136), (775.332382372, -61.245644149), (764.774270693, -63.022725712), (752.121699379, -65.058370184), (739.471043309, -66.973596397), (728.939784684, -68.449094171), (720.517449562, -69.537326192), (715.259153852, -70.176918919), (711.038260137, -70.66442021), (708.433468196, -70.954566837), (706.256268563, -71.189411511), (704.527211696, -71.372087014), (702.961854911, -71.534187022), (702.04697488, -71.626796619), (701.573370465, -71.674259434)],
                knots=[1.1996e-05, 1.1996e-05, 1.1996e-05, 1.1996e-05, 0.031261621, 0.062511246, 0.125010496, 0.187509746, 0.250008997, 0.375007497, 0.500005998, 0.625004498, 0.750002999, 0.812502249, 0.875001499, 0.906251125, 0.93750075, 0.953125562, 0.968750375, 0.984375187, 1, 1, 1, 1], degree=3))
            add(Edge.make_bspline(
                [(701.573370465, -71.674259434), (701.113019016, -71.720314305), (700.191895387, -71.812223809), (698.812500771, -71.948951554), (697.434189716, -72.08448281), (696.516819195, -72.173843609), (696.057912544, -72.218303811)],
                knots=[0.000436824, 0.000436824, 0.000436824, 0.000436824, 0.250279009, 0.500121194, 0.749963378, 0.999805563, 0.999805563, 0.999805563, 0.999805563], degree=3))
            add(Edge.make_bspline(
                [(696.057912544, -72.218303811), (695.087462196, -72.311946881), (693.135698373, -72.496722872), (690.270265001, -72.757917882), (687.338409796, -73.01607439), (685.427037387, -73.178353817), (684.465771861, -73.258588893)],
                knots=[-3.996e-06, -3.996e-06, -3.996e-06, -3.996e-06, 0.249945754, 0.499895504, 0.749845254, 0.999795004, 0.999795004, 0.999795004, 0.999795004], degree=3))
            add(Edge.make_bspline(
                [(684.465771861, -73.258588893), (683.554235836, -73.334679882), (681.719672317, -73.486306526), (678.141033863, -73.776630779), (673.963588211, -74.106706625), (669.157253218, -74.473896148), (662.341271598, -74.981221252), (653.811394813, -75.590339748), (643.562499486, -76.293021789), (633.288768179, -76.978079707), (624.748165187, -77.541006681), (617.82142797, -77.998720132), (612.488020924, -78.352754528), (607.327656264, -78.697993222), (604.074214061, -78.917973041), (602.42420841, -79.030202072)],
                knots=[4.679e-06, 4.679e-06, 4.679e-06, 4.679e-06, 0.031254549, 0.062504419, 0.125004159, 0.1875039, 0.25000364, 0.375003121, 0.500002601, 0.625002082, 0.750001563, 0.812501303, 0.875001043, 0.937500783, 1.000000524, 1.000000524, 1.000000524, 1.000000524], degree=3))
            add(Edge.make_bspline(
                [(602.42420841, -79.030202072), (600.639671821, -79.151478022), (597.052441707, -79.396103056), (590.024015055, -79.880194977), (581.568137842, -80.474939815), (571.571389273, -81.203899916), (562.976897794, -81.853433898), (556.116782859, -82.386921041), (550.972711882, -82.793890253), (545.828810606, -83.207047886), (541.716519062, -83.541156396), (539.282690998, -83.740007149), (538.573908081, -83.797990994)],
                knots=[1.3823e-05, 1.3823e-05, 1.3823e-05, 1.3823e-05, 0.062512694, 0.125011564, 0.250009305, 0.375007046, 0.500004787, 0.562503658, 0.625002528, 0.687501399, 0.750000269, 0.775424, 0.775424, 0.775424, 0.775424], degree=3))
        make_face()
    extrude(amount=-CUT_EXTRUDE1_DEPTH, mode=Mode.SUBTRACT)


with BuildPart() as cut_extrude1_kept_piece:
    # of the separate pieces the step leaves, the one the design keeps (cut_extrude1_pieces_kept)
    add(part.part.solids().sort_by_distance((520.17866376, -1.5875, 85.310815783))[0])


solid = cut_extrude1_kept_piece.part
